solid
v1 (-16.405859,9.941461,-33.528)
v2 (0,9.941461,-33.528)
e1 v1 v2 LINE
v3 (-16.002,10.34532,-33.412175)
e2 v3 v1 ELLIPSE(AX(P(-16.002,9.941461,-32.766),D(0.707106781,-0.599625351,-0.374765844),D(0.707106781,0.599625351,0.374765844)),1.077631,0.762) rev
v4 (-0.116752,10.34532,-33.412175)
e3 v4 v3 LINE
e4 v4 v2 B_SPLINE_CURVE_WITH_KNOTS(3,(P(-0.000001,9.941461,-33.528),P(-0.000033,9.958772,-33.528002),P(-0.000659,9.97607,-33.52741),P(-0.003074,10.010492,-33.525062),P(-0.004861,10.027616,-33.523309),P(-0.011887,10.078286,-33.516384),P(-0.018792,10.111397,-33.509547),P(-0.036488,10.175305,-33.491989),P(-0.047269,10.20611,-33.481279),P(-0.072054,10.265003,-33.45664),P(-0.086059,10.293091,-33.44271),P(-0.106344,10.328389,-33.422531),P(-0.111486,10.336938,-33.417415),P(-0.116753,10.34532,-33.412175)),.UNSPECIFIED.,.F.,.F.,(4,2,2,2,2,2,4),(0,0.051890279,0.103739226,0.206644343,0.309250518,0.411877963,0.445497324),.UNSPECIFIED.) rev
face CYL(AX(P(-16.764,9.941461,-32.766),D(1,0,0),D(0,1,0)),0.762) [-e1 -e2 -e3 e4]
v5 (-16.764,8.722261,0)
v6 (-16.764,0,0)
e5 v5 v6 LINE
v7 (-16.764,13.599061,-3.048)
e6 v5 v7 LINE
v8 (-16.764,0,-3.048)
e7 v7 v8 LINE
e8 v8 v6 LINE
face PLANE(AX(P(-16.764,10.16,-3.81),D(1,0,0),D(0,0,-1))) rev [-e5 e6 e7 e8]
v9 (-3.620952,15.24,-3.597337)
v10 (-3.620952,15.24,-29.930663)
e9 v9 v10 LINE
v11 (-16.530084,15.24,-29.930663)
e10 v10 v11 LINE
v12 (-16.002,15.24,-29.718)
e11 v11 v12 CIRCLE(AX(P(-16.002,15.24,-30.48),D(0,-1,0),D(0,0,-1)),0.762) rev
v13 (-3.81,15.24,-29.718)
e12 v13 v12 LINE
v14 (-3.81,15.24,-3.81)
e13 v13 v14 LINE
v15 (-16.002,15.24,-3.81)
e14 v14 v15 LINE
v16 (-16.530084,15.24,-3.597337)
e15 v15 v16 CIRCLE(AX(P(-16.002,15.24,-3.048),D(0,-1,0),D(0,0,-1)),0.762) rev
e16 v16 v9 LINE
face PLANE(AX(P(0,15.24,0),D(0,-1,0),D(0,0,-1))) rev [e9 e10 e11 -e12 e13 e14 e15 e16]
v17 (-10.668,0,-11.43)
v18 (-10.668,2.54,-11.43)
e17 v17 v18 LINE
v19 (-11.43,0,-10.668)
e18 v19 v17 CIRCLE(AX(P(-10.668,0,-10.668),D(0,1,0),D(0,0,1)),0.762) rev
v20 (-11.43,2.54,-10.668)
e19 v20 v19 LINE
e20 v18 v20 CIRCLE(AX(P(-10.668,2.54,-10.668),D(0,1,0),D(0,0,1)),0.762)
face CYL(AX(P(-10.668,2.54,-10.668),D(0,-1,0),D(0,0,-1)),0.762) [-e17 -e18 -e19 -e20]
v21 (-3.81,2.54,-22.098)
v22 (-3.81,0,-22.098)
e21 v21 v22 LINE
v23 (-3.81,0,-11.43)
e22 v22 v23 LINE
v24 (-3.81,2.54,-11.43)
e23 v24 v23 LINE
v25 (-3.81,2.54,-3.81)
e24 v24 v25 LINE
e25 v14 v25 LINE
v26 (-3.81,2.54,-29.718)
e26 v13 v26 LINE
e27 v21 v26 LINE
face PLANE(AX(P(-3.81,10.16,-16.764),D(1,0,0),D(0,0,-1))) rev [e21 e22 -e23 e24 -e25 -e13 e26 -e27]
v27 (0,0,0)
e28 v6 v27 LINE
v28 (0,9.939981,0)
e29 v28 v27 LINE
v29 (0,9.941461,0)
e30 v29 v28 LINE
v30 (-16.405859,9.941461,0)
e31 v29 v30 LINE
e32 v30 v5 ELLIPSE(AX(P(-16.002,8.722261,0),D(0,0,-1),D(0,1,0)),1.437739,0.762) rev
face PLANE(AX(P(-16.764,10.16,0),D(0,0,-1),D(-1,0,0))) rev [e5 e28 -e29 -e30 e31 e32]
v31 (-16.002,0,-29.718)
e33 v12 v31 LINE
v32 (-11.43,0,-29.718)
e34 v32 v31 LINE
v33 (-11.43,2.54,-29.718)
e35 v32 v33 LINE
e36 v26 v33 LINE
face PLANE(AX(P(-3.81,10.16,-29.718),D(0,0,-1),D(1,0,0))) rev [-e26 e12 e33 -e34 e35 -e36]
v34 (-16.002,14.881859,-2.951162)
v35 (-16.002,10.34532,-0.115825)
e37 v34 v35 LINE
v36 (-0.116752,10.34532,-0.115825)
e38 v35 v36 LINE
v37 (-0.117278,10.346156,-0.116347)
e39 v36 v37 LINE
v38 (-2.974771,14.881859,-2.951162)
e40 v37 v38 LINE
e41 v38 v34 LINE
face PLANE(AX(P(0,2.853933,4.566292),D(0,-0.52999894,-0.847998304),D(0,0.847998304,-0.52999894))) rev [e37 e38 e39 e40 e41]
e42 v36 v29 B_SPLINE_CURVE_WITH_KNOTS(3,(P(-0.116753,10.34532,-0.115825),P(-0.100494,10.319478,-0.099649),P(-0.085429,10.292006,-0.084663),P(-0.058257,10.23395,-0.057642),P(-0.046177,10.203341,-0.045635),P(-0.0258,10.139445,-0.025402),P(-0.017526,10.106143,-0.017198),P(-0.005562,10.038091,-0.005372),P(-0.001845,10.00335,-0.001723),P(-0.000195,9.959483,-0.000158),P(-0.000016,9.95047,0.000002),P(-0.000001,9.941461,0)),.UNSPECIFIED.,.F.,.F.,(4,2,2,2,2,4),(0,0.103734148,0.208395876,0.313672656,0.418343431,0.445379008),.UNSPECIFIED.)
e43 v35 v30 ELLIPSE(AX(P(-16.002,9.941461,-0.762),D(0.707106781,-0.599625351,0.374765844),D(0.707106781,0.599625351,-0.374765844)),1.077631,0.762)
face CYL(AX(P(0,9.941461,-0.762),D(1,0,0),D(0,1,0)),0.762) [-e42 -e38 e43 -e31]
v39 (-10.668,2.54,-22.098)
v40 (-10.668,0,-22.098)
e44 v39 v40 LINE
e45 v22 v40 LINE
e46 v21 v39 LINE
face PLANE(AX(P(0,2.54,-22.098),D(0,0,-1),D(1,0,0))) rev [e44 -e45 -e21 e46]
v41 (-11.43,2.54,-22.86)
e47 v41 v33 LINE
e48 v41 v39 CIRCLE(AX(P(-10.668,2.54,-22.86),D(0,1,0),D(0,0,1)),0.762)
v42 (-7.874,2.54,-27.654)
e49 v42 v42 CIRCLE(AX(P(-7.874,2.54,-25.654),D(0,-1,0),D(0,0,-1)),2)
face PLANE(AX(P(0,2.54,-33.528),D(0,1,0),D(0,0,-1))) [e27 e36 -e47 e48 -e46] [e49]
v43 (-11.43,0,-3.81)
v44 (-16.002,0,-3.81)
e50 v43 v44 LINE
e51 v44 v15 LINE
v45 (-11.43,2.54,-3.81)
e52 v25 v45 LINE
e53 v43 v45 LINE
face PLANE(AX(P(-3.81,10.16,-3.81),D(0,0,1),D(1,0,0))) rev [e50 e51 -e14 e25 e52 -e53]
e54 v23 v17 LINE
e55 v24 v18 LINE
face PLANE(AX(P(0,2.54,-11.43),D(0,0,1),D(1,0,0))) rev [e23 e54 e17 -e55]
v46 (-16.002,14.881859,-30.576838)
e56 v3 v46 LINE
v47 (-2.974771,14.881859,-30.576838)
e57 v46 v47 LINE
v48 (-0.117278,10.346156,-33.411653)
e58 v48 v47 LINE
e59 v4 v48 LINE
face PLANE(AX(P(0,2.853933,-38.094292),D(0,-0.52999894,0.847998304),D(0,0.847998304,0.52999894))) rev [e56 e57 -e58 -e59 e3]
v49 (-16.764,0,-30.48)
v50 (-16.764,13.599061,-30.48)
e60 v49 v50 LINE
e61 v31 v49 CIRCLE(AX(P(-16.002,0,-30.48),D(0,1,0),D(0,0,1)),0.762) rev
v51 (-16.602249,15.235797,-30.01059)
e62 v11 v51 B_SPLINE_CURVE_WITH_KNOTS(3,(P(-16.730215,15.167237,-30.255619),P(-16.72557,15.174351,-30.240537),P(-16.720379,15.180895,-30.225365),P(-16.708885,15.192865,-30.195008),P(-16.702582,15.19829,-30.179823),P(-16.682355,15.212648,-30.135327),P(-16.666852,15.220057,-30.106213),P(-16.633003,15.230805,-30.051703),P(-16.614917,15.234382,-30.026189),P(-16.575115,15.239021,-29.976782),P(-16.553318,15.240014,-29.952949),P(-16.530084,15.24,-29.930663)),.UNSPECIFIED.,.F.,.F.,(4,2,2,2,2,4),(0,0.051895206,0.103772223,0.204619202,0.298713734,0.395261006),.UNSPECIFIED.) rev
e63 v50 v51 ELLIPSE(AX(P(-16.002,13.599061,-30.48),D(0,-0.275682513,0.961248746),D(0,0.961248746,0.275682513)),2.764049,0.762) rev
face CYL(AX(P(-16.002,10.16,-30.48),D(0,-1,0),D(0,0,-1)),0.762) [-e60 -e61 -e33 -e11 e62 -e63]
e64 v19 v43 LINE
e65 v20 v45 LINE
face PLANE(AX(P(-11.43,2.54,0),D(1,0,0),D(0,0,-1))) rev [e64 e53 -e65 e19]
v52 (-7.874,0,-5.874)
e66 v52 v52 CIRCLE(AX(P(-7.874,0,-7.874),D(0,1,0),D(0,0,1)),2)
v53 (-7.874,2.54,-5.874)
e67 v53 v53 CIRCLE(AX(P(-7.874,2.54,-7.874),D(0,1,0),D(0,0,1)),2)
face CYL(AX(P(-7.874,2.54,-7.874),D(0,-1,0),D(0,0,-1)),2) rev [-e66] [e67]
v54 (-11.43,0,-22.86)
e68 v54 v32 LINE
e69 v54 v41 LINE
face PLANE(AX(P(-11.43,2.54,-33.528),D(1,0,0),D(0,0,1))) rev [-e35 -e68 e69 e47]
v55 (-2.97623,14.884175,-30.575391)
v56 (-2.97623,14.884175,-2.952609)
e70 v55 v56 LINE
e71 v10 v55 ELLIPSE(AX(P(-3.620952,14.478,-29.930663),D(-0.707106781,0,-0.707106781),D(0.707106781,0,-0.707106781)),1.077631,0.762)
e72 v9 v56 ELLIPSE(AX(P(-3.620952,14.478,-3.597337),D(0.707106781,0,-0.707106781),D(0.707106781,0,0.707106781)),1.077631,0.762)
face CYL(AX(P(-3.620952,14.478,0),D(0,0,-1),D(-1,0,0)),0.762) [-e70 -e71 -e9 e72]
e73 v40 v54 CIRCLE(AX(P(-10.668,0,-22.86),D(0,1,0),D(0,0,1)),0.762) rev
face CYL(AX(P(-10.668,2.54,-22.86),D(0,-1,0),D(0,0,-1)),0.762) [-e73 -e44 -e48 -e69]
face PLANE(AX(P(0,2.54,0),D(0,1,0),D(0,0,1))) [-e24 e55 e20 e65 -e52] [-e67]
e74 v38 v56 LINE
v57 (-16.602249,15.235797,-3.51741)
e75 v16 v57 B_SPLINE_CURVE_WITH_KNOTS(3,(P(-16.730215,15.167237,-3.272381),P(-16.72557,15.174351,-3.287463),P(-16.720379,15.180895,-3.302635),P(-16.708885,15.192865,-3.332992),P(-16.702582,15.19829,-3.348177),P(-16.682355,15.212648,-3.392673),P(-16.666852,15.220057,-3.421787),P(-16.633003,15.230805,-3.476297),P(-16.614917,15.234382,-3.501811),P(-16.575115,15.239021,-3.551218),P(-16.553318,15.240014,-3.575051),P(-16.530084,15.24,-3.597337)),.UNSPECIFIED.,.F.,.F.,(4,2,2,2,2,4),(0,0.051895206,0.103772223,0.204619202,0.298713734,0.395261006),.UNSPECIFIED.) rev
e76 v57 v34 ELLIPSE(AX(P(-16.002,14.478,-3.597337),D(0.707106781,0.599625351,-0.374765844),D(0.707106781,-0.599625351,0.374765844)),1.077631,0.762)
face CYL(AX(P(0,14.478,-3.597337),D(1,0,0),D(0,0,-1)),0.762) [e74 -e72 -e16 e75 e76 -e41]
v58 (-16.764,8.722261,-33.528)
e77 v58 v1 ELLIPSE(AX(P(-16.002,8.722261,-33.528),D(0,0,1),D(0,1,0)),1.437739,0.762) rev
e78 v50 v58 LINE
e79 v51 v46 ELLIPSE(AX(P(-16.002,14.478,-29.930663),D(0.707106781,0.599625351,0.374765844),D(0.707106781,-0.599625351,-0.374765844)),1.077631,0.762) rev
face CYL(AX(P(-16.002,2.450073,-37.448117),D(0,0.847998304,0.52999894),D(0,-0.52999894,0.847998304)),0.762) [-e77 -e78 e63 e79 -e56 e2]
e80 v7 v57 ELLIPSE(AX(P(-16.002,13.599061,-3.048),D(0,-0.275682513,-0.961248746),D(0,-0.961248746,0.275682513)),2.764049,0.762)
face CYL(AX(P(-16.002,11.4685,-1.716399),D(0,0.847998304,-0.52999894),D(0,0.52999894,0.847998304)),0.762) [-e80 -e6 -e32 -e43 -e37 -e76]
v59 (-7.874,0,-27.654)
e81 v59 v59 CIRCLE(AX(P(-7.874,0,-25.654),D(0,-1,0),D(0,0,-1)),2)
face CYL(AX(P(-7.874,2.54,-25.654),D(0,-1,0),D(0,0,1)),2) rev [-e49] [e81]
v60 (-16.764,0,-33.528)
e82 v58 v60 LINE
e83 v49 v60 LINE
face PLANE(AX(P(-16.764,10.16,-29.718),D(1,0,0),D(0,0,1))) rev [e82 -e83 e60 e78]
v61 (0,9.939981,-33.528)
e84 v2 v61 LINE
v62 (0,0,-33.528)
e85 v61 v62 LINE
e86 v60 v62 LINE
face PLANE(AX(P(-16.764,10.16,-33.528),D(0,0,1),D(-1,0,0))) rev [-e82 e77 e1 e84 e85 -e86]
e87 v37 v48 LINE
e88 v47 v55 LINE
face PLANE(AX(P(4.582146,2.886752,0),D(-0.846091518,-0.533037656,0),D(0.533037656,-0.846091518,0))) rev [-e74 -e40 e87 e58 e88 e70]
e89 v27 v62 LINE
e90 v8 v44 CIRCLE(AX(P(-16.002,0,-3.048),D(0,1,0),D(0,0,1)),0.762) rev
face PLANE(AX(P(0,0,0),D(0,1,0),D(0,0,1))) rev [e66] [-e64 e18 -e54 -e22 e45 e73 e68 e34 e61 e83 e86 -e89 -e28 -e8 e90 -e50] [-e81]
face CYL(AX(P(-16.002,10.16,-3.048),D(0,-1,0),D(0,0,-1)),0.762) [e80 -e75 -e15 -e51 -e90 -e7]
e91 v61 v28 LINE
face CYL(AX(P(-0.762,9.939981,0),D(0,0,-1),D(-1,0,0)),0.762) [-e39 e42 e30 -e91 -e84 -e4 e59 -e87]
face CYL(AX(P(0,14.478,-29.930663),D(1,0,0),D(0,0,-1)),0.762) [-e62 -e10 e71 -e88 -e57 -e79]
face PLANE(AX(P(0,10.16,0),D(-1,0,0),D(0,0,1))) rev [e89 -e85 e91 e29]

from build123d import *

# Parameters (mm, degrees)
BOSS_EXTRUDE1_DEPTH = 10.16
SKETCH2_W           = 11.43
SKETCH2_H           = 11.43
SKETCH2_R           = 2
BOSS_EXTRUDE2_DEPTH = 2.54
FILLET2_R           = 0.762


with BuildPart() as part:
    # Sketch1 → Boss-Extrude1 (new body)
    with BuildSketch(Plane(origin=(0, 0, 0), x_dir=(1, 0, 0), z_dir=(0, 1, 0))):
        Polygon((0, 0), (0, 16.764), (-3.81, 16.764), (-3.81, 3.81), (-16.764, 3.81), (-16.764, 0), align=None)
    extrude(amount=BOSS_EXTRUDE1_DEPTH)

    # Sketch2 → Boss-Extrude2 (add)
    with BuildSketch(Plane(origin=(0, 0, 0), x_dir=(1, 0, 0), z_dir=(0, 1, 0))):
        with Locations((-5.715, 5.715)):
            Rectangle(SKETCH2_W, SKETCH2_H)
        with Locations(Location((-7.874, 7.874, 0), (0, 0, 270))):
            Circle(SKETCH2_R, mode=Mode.SUBTRACT)
    extrude(amount=BOSS_EXTRUDE2_DEPTH)

    # Sketch3 → section 1 of loft3
    with BuildSketch(Plane(origin=(0, 15.24, 0), x_dir=(1, 0, 0), z_dir=(0, 1, 0)), mode=Mode.PRIVATE) as loft3_s1:
        with BuildLine():
            Line((-3.2004, 3.175), (-3.2004, 16.764))
            Line((-3.2004, 16.764), (-3.81, 16.764))
            Line((-3.81, 16.764), (-3.81, 3.81))
            Line((-3.81, 3.81), (-16.764, 3.81))
            Line((-16.764, 3.81), (-16.764, 3.175))
            Line((-16.764, 3.175), (-3.2004, 3.175))
        make_face()
    # loft from a face of the part (loft3)
    loft([part.faces().sort_by_distance((-0.237078762, 10.16, -8.382))[0], loft3_s1.sketch])

    # Mirror4: part across plane


with BuildPart() as part_1:
    add(part.part)
    add(part.part.mirror(Plane(origin=(0, 10.16, -16.764), x_dir=(1, 0, 0), z_dir=(0, 0, 1))))

    # Fillet2
    # the kernel refuses this fillet: 0.762 mm, written as the material it takes off along each edge
    with BuildSketch(Plane(origin=(-16.764, -1.905, -3.81), x_dir=(0, 0, 1), z_dir=(0, 1, 0)), Plane(origin=(-16.764, -1.905, -29.718), x_dir=(1, 0, 0), z_dir=(0, 1, 0))) as fillet2_piece_1:
        with BuildLine():
            CenterArc((FILLET2_R, FILLET2_R), FILLET2_R, 180, 90)
            Line((0, FILLET2_R), (0, 0))
            Line((0, 0), (FILLET2_R, 0))
        make_face()
    extrude(amount=19.05, mode=Mode.SUBTRACT)
    with BuildSketch(Plane(origin=(-11.43, -1.905, -11.43), x_dir=(0, 0, 1), z_dir=(0, 1, 0))) as fillet2_piece_2:
        with BuildLine():
            CenterArc((FILLET2_R, FILLET2_R), FILLET2_R, 180, 90)
            Line((0, FILLET2_R), (0, 0))
            Line((0, 0), (FILLET2_R, 0))
        make_face()
    extrude(amount=6.35, mode=Mode.SUBTRACT)
    with BuildSketch(Plane(origin=(-17.819841757, 15.24, -3.175), x_dir=(0, 0, -1), z_dir=(1, 0, 0)), Plane(origin=(-17.819841757, 15.24, -30.353), x_dir=(0, -0.8479983040050892, -0.5299989400031782), z_dir=(1, 0, 0))) as fillet2_piece_3:
        with BuildLine():
            CenterArc((FILLET2_R * 0.554247641507, -FILLET2_R), FILLET2_R, 90, 57.994616792)
            Line((-FILLET2_R * 0.293750662498, -FILLET2_R * 0.470001059997), (0, 0))
            Line((0, 0), (FILLET2_R * 0.554247641507, 0))
        make_face()
    extrude(amount=15.675283514, mode=Mode.SUBTRACT)
    with BuildSketch(Plane(origin=(-3.2004, 15.24, -31.404379485), x_dir=(-1, 0, 0), z_dir=(0, 0, 1))) as fillet2_piece_4:
        with BuildLine():
            CenterArc((FILLET2_R * 0.551905241549, FILLET2_R), FILLET2_R, 212.210927724, 57.789072276)
            Line((-FILLET2_R * 0.29418627649, FILLET2_R * 0.466962343635), (0, 0))
            Line((0, 0), (FILLET2_R * 0.551905241549, 0))
        make_face()
    extrude(amount=29.28075897, mode=Mode.SUBTRACT)
    with BuildSketch(Plane(origin=(-16.764, 8.544563231, 1.009647981), x_dir=(1, 0, 0), z_dir=(0, 0.847998304005088, -0.5299989400031799))) as fillet2_piece_5:
        with BuildLine():
            CenterArc((FILLET2_R, FILLET2_R), FILLET2_R, 180, 90)
            Line((0, FILLET2_R), (0, 0))
            Line((0, 0), (FILLET2_R, 0))
        make_face()
    extrude(amount=9.800578019, mode=Mode.SUBTRACT)
    with BuildSketch(Plane(origin=(-17.310346811, 10.16, 0), x_dir=(0, 0.8479983040050875, -0.5299989400031807), z_dir=(1, 0, 0)), Plane(origin=(-17.310346811, 10.16, -33.528), x_dir=(0, -1, 0), z_dir=(1, 0, 0))) as fillet2_piece_6:
        with BuildLine():
            CenterArc((FILLET2_R * 0.286796226411, -FILLET2_R), FILLET2_R, 90, 32.005383208)
            Line((-FILLET2_R * 0.243202713592, -FILLET2_R * 0.152001695995), (0, 0))
            Line((0, 0), (FILLET2_R * 0.286796226411, 0))
        make_face()
    extrude(amount=17.856693623, mode=Mode.SUBTRACT)
    with BuildSketch(Plane(origin=(-11.43, -1.905, -22.098), x_dir=(0, 0, -1), z_dir=(0, 1, 0))) as fillet2_piece_7:
        with BuildLine():
            CenterArc((FILLET2_R, -FILLET2_R), FILLET2_R, 90, 90)
            Line((0, -FILLET2_R), (0, 0))
            Line((0, 0), (FILLET2_R, 0))
        make_face()
    extrude(amount=6.35, mode=Mode.SUBTRACT)
    with BuildSketch(Plane(origin=(-16.764, 8.544563231, -34.537647981), x_dir=(1, 0, 0), z_dir=(0, 0.847998304005088, 0.5299989400031797))) as fillet2_piece_8:
        with BuildLine():
            CenterArc((FILLET2_R, -FILLET2_R), FILLET2_R, 90, 90)
            Line((0, -FILLET2_R), (0, 0))
            Line((0, 0), (FILLET2_R, 0))
        make_face()
    extrude(amount=9.800578019, mode=Mode.SUBTRACT)
    with BuildSketch(Plane(origin=(0, 10.16, -34.078046802), x_dir=(0, -1, 0), z_dir=(0, 0, 1))) as fillet2_piece_9:
        with BuildLine():
            CenterArc((FILLET2_R * 0.288738478649, -FILLET2_R), FILLET2_R, 90, 32.210927724)
            Line((-FILLET2_R * 0.244299177716, -FILLET2_R * 0.153908481961), (0, 0))
            Line((0, 0), (FILLET2_R * 0.288738478649, 0))
        make_face()
    extrude(amount=34.628093604, mode=Mode.SUBTRACT)


solid = part_1.part
